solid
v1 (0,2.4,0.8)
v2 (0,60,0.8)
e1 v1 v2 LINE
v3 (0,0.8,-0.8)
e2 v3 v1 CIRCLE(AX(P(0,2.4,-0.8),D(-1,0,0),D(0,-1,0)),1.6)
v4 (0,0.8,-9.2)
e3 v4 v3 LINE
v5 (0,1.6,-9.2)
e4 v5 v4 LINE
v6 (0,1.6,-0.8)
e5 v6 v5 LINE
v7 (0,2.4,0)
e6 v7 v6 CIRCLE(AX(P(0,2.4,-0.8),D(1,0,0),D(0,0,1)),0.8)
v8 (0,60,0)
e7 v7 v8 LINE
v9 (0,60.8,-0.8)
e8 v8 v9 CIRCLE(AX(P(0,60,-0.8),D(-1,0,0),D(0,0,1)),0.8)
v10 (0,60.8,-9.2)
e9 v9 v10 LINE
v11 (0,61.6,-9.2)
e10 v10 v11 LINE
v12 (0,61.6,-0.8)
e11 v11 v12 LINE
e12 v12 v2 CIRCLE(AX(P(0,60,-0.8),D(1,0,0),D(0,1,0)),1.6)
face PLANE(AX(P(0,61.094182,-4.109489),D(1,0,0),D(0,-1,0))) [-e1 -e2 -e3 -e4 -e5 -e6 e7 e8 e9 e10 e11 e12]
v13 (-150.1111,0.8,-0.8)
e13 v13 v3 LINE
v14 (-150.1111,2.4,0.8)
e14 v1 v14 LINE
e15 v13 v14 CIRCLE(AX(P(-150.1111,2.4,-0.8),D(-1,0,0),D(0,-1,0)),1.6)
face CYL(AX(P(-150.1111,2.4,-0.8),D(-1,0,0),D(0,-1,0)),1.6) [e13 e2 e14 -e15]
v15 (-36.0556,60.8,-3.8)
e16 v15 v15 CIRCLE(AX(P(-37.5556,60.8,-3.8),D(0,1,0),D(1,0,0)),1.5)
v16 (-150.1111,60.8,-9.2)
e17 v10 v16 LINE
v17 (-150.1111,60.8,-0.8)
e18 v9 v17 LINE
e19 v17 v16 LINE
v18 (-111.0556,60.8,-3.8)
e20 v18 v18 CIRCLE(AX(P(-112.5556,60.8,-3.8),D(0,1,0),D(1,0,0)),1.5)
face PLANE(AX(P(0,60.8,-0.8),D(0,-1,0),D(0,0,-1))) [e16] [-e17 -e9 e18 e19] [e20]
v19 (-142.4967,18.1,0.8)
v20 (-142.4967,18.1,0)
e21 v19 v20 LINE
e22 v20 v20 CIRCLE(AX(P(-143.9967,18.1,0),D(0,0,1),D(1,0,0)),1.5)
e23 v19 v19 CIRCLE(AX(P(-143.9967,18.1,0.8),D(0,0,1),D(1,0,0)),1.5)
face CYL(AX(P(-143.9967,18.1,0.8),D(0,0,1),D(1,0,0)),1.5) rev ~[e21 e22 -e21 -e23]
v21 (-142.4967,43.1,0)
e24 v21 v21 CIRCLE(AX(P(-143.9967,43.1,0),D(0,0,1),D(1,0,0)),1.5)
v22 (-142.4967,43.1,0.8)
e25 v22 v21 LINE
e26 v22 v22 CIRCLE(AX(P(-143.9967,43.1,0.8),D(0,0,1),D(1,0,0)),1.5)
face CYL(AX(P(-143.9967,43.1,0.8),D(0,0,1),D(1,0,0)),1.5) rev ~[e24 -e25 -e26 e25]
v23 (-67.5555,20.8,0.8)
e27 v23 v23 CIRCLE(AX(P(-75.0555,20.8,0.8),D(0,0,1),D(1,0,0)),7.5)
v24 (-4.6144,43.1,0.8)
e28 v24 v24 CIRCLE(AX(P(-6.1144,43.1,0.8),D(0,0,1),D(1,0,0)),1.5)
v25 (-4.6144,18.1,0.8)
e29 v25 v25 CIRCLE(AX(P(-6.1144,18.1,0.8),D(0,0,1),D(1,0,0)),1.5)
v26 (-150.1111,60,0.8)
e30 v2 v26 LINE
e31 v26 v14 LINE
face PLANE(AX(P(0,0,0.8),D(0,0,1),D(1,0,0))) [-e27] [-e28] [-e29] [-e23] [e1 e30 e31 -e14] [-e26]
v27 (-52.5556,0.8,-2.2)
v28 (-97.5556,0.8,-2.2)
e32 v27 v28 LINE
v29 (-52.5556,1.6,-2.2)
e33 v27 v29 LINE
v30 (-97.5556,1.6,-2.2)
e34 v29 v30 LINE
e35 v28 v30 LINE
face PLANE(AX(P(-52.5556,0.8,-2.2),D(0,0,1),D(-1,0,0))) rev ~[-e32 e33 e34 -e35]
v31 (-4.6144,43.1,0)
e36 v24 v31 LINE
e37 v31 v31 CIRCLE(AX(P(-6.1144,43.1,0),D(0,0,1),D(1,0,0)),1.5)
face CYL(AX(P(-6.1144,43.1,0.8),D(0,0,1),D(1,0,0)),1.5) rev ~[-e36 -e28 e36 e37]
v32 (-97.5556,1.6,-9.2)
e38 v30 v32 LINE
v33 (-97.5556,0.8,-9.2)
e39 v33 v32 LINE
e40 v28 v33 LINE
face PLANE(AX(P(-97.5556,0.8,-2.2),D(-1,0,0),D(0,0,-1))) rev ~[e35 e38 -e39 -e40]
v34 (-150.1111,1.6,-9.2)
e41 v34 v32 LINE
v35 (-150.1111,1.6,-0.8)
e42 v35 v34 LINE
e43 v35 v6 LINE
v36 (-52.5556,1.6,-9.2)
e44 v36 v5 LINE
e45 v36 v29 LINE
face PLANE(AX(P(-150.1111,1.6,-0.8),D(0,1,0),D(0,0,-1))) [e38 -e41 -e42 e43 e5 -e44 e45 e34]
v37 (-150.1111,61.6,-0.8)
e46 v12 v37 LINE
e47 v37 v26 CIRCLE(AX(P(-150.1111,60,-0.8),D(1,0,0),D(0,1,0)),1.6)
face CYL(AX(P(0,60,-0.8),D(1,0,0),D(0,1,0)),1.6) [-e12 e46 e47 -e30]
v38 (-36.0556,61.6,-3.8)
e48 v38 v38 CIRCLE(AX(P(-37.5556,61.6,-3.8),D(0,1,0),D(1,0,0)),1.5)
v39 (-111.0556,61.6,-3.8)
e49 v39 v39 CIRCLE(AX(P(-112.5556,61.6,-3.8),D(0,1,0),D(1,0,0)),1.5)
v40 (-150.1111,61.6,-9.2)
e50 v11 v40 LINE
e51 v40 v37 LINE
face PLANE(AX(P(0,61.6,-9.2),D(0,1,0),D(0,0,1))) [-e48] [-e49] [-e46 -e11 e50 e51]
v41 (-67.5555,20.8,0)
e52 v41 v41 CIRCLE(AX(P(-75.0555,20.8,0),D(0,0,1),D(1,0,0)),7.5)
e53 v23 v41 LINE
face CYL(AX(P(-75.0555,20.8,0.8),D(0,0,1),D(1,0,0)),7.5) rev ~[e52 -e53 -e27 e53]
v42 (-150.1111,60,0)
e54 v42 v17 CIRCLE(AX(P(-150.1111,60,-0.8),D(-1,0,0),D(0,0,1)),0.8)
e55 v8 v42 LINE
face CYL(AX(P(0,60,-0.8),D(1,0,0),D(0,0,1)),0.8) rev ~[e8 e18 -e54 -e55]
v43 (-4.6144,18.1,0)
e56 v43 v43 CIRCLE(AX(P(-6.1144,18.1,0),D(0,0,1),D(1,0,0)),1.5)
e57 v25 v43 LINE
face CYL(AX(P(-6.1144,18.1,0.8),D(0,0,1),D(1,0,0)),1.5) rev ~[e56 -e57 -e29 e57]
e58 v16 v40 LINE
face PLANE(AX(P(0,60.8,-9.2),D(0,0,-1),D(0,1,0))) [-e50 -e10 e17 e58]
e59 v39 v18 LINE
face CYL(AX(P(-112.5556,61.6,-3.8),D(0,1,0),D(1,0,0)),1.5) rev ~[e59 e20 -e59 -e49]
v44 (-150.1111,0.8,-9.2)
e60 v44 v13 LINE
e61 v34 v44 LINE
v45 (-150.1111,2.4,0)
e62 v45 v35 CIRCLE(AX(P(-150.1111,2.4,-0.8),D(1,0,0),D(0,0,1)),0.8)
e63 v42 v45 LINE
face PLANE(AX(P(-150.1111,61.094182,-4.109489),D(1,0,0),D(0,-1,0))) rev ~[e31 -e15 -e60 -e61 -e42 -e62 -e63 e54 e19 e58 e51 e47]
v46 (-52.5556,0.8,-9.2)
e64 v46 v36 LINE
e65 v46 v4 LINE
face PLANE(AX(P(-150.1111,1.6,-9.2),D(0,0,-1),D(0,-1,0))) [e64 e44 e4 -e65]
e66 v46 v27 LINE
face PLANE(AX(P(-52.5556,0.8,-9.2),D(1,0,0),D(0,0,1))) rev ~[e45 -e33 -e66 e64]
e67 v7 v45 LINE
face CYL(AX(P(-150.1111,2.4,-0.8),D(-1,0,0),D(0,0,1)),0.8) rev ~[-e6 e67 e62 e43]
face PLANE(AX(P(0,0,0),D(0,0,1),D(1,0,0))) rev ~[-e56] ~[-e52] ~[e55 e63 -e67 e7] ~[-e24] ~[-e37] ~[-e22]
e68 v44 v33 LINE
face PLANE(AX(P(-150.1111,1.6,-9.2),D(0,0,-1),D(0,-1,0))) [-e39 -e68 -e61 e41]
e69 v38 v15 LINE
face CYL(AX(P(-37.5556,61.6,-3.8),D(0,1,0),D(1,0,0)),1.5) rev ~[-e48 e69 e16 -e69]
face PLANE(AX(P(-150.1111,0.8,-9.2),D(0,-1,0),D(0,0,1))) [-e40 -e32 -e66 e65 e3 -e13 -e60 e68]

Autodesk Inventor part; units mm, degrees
ref_plane "YZ Plane" through (0, 0, 0) normal (1, 0, 0) x (0, 1, 0)
ref_plane "XZ Plane" through (0, 0, 0) normal (0, 1, 0) x (-1, 0, 0)
ref_plane "XY Plane" through (0, 0, 0) normal (0, 0, 1) x (1, 0, 0)
ref_plane "Płaszczyzna konstrukcyjna1" through (0, 0, 0) normal (0, 0, 1) x (1, 0, 0)
sketch "Szkic2" plane through (0, 0, 0) normal (0, 0, 1) x (1, 0, 0)
  line L0 (0, 0.8) -> (-150.1111, 0.8)
  line L1 (-150.1111, 0) -> (-150.1111, 0.8)
  line L2 (0, 0) -> (-150.1111, 0)
  line L3 (0, 0) -> (0, 0.8)
  line L4 (-150.1111, 0) -> (0, 0)
  line L5 (0, 0) -> (0, 60)
  line L6 (0, 60) -> (-150.1111, 60)
  line L7 (-150.1111, 60) -> (-150.1111, 0)
  dimension "d0" = 60
extrude "Płyta1" add sketch "Szkic2" along normal blind 0.8 contours L0 L7 L6 L5
sketch "Szkic3" plane through (-150.1111, 1.6, 0.8) normal (0, -1, 0) x (1, 0, 0)
  line L0 (150.1111, 0) -> (0, 0)
  line L1 (0, 0) -> (0, -10)
  line L2 (0, -10) -> (150.1111, -10)
  line L3 (150.1111, -10) -> (150.1111, 0)
edge flange "Kołnierz1" height 10 angle 90 thickness 0.8 bend radius 0.8 thickness toward (0, -1, 0) relief straight relief width 0.8 relief depth 0.4 edges at (-75.0555, 0.8, 0) wall of the first edge with corners at (0, 1.6, 0.8) (-150.1111, 1.6, 0.8) (-150.1111, 1.6, -9.2) (0, 1.6, -9.2)
bend "Gięcie1"
corner "Narożnik1"
sketch "Szkic4" plane through (0, 60.8, -0.8) normal (0, 1, 0) x (-1, 0, 0)
  line L0 (150.1111, 0) -> (0, 0)
  line L1 (0, 0) -> (0, -8.4)
  line L2 (0, -8.4) -> (150.1111, -8.4)
  line L3 (150.1111, -8.4) -> (150.1111, 0)
edge flange "Kołnierz2" height 10 angle 90 thickness 0.8 bend radius 0.8 thickness toward (0, 1, 0) relief straight relief width 0.8 relief depth 0.4 edges at (-75.0555, 60, 0) wall of the first edge with corners at (-150.1111, 60.8, -0.8) (0, 60.8, -0.8) (0, 60.8, -9.2) (-150.1111, 60.8, -9.2)
bend "Gięcie2"
corner "Narożnik2"
sketch "Szkic5" plane through (-150.1111, 0.8, -9.2) normal (0, -1, 0) x (1, 0, 0)
  line L0 (150.1111, 0) -> (0, 0) projected
  line L1 (0, 0) -> (150.1111, 0) construction
  line L2 (75.0555, 0) -> (75.0555, 31.3517) construction
  line L3 (52.5555, 0) -> (97.5555, 0)
  line L4 (97.5555, 0) -> (97.5555, 7)
  line L5 (97.5555, 7) -> (52.5555, 7)
  line L6 (52.5555, 7) -> (52.5555, 0)
  point P0 (150.1111, 9.2)
  dimension "d22" = 7
  dimension "d23" = 45
extrude "Wytnij1" cut sketch "Szkic5" against normal blind 0.8
sketch "Szkic6" plane through (-150.1111, 61.6, -9.2) normal (0, 1, 0) x (1, 0, 0)
  circle A0 centre (37.5555, -5.4) radius 1.5 projected
  circle A1 centre (112.5555, -5.4) radius 1.5 projected
  point P0 (150.1111, -9.2)
extrude "Wytnij2" cut sketch "Szkic6" against normal blind 0.8
sketch "Szkic7" plane through (0, 0, 0.8) normal (0, 0, 1) x (1, 0, 0)
  circle A0 centre (-143.9967, 43.1) radius 1.5 projected
  circle A1 centre (-143.9967, 18.1) radius 1.5 projected
  circle A2 centre (-6.1144, 18.1) radius 1.5 projected
  circle A3 centre (-6.1144, 43.1) radius 1.5 projected
  point P0 (0, 0)
extrude "Wytnij3" cut sketch "Szkic7" against normal blind 0.8
sketch "Szkic8" plane through (0, 0, 0.8) normal (0, 0, 1) x (1, 0, 0)
  circle A0 centre (-75.0555, 20.8) radius 7.5
  point P0 (0, 0)
  dimension "d30" = 15
extrude "Wytnij4" cut sketch "Szkic8" against normal blind 0.8
equation "\"d24\" = Grubość"
equation "\"d26\" = Grubość"
equation "\"d28\" = Grubość"
equation "\"d31\" = Grubość"
equation "\"d2\" = SzerokośćGięciaPodcięcia"
equation "\"d3\" = GłębokośćGięciaPodcięcia"
equation "\"d4\" = MinimalnaPozostałość"
equation "\"d5\" = PromieńGięcia"
equation "\"d8\" = PromieńGięcia"
equation "\"d9\" = RozmiarPodcięciaNarożnika"
equation "\"d10\" = Wielk_odstępu"
equation "\"d11\" = Rozmiar_promienia_Jacobiego"
equation "\"d12\" = SzerokośćGięciaPodcięcia"
equation "\"d13\" = GłębokośćGięciaPodcięcia"
equation "\"d14\" = MinimalnaPozostałość"
equation "\"d15\" = PromieńGięcia"
equation "\"d18\" = PromieńGięcia"
equation "\"d19\" = RozmiarPodcięciaNarożnika"
equation "\"d20\" = Wielk_odstępu"
equation "\"d21\" = Rozmiar_promienia_Jacobiego"
equation "\"PromieńGięcia\" = Grubość"
equation "\"SzerokośćGięciaPodcięcia\" = Grubość"
equation "\"GłębokośćGięciaPodcięcia\" = 0.5 * Grubość"
equation "\"RozmiarPodcięciaNarożnika\" = 4 * Grubość"
equation "\"MinimalnaPozostałość\" = 2 * Grubość"
equation "\"PromieńPrzejścia\" = PromieńGięcia"
equation "\"Rozmiar_promienia_Jacobiego\" = Grubość"
equation "\"Wielk_odstępu\" = Grubość"
equation "\"d1\" = PromieńGięcia"
equation "\"Grubość\" = 0.8"
properties part number "base_side_constr"
